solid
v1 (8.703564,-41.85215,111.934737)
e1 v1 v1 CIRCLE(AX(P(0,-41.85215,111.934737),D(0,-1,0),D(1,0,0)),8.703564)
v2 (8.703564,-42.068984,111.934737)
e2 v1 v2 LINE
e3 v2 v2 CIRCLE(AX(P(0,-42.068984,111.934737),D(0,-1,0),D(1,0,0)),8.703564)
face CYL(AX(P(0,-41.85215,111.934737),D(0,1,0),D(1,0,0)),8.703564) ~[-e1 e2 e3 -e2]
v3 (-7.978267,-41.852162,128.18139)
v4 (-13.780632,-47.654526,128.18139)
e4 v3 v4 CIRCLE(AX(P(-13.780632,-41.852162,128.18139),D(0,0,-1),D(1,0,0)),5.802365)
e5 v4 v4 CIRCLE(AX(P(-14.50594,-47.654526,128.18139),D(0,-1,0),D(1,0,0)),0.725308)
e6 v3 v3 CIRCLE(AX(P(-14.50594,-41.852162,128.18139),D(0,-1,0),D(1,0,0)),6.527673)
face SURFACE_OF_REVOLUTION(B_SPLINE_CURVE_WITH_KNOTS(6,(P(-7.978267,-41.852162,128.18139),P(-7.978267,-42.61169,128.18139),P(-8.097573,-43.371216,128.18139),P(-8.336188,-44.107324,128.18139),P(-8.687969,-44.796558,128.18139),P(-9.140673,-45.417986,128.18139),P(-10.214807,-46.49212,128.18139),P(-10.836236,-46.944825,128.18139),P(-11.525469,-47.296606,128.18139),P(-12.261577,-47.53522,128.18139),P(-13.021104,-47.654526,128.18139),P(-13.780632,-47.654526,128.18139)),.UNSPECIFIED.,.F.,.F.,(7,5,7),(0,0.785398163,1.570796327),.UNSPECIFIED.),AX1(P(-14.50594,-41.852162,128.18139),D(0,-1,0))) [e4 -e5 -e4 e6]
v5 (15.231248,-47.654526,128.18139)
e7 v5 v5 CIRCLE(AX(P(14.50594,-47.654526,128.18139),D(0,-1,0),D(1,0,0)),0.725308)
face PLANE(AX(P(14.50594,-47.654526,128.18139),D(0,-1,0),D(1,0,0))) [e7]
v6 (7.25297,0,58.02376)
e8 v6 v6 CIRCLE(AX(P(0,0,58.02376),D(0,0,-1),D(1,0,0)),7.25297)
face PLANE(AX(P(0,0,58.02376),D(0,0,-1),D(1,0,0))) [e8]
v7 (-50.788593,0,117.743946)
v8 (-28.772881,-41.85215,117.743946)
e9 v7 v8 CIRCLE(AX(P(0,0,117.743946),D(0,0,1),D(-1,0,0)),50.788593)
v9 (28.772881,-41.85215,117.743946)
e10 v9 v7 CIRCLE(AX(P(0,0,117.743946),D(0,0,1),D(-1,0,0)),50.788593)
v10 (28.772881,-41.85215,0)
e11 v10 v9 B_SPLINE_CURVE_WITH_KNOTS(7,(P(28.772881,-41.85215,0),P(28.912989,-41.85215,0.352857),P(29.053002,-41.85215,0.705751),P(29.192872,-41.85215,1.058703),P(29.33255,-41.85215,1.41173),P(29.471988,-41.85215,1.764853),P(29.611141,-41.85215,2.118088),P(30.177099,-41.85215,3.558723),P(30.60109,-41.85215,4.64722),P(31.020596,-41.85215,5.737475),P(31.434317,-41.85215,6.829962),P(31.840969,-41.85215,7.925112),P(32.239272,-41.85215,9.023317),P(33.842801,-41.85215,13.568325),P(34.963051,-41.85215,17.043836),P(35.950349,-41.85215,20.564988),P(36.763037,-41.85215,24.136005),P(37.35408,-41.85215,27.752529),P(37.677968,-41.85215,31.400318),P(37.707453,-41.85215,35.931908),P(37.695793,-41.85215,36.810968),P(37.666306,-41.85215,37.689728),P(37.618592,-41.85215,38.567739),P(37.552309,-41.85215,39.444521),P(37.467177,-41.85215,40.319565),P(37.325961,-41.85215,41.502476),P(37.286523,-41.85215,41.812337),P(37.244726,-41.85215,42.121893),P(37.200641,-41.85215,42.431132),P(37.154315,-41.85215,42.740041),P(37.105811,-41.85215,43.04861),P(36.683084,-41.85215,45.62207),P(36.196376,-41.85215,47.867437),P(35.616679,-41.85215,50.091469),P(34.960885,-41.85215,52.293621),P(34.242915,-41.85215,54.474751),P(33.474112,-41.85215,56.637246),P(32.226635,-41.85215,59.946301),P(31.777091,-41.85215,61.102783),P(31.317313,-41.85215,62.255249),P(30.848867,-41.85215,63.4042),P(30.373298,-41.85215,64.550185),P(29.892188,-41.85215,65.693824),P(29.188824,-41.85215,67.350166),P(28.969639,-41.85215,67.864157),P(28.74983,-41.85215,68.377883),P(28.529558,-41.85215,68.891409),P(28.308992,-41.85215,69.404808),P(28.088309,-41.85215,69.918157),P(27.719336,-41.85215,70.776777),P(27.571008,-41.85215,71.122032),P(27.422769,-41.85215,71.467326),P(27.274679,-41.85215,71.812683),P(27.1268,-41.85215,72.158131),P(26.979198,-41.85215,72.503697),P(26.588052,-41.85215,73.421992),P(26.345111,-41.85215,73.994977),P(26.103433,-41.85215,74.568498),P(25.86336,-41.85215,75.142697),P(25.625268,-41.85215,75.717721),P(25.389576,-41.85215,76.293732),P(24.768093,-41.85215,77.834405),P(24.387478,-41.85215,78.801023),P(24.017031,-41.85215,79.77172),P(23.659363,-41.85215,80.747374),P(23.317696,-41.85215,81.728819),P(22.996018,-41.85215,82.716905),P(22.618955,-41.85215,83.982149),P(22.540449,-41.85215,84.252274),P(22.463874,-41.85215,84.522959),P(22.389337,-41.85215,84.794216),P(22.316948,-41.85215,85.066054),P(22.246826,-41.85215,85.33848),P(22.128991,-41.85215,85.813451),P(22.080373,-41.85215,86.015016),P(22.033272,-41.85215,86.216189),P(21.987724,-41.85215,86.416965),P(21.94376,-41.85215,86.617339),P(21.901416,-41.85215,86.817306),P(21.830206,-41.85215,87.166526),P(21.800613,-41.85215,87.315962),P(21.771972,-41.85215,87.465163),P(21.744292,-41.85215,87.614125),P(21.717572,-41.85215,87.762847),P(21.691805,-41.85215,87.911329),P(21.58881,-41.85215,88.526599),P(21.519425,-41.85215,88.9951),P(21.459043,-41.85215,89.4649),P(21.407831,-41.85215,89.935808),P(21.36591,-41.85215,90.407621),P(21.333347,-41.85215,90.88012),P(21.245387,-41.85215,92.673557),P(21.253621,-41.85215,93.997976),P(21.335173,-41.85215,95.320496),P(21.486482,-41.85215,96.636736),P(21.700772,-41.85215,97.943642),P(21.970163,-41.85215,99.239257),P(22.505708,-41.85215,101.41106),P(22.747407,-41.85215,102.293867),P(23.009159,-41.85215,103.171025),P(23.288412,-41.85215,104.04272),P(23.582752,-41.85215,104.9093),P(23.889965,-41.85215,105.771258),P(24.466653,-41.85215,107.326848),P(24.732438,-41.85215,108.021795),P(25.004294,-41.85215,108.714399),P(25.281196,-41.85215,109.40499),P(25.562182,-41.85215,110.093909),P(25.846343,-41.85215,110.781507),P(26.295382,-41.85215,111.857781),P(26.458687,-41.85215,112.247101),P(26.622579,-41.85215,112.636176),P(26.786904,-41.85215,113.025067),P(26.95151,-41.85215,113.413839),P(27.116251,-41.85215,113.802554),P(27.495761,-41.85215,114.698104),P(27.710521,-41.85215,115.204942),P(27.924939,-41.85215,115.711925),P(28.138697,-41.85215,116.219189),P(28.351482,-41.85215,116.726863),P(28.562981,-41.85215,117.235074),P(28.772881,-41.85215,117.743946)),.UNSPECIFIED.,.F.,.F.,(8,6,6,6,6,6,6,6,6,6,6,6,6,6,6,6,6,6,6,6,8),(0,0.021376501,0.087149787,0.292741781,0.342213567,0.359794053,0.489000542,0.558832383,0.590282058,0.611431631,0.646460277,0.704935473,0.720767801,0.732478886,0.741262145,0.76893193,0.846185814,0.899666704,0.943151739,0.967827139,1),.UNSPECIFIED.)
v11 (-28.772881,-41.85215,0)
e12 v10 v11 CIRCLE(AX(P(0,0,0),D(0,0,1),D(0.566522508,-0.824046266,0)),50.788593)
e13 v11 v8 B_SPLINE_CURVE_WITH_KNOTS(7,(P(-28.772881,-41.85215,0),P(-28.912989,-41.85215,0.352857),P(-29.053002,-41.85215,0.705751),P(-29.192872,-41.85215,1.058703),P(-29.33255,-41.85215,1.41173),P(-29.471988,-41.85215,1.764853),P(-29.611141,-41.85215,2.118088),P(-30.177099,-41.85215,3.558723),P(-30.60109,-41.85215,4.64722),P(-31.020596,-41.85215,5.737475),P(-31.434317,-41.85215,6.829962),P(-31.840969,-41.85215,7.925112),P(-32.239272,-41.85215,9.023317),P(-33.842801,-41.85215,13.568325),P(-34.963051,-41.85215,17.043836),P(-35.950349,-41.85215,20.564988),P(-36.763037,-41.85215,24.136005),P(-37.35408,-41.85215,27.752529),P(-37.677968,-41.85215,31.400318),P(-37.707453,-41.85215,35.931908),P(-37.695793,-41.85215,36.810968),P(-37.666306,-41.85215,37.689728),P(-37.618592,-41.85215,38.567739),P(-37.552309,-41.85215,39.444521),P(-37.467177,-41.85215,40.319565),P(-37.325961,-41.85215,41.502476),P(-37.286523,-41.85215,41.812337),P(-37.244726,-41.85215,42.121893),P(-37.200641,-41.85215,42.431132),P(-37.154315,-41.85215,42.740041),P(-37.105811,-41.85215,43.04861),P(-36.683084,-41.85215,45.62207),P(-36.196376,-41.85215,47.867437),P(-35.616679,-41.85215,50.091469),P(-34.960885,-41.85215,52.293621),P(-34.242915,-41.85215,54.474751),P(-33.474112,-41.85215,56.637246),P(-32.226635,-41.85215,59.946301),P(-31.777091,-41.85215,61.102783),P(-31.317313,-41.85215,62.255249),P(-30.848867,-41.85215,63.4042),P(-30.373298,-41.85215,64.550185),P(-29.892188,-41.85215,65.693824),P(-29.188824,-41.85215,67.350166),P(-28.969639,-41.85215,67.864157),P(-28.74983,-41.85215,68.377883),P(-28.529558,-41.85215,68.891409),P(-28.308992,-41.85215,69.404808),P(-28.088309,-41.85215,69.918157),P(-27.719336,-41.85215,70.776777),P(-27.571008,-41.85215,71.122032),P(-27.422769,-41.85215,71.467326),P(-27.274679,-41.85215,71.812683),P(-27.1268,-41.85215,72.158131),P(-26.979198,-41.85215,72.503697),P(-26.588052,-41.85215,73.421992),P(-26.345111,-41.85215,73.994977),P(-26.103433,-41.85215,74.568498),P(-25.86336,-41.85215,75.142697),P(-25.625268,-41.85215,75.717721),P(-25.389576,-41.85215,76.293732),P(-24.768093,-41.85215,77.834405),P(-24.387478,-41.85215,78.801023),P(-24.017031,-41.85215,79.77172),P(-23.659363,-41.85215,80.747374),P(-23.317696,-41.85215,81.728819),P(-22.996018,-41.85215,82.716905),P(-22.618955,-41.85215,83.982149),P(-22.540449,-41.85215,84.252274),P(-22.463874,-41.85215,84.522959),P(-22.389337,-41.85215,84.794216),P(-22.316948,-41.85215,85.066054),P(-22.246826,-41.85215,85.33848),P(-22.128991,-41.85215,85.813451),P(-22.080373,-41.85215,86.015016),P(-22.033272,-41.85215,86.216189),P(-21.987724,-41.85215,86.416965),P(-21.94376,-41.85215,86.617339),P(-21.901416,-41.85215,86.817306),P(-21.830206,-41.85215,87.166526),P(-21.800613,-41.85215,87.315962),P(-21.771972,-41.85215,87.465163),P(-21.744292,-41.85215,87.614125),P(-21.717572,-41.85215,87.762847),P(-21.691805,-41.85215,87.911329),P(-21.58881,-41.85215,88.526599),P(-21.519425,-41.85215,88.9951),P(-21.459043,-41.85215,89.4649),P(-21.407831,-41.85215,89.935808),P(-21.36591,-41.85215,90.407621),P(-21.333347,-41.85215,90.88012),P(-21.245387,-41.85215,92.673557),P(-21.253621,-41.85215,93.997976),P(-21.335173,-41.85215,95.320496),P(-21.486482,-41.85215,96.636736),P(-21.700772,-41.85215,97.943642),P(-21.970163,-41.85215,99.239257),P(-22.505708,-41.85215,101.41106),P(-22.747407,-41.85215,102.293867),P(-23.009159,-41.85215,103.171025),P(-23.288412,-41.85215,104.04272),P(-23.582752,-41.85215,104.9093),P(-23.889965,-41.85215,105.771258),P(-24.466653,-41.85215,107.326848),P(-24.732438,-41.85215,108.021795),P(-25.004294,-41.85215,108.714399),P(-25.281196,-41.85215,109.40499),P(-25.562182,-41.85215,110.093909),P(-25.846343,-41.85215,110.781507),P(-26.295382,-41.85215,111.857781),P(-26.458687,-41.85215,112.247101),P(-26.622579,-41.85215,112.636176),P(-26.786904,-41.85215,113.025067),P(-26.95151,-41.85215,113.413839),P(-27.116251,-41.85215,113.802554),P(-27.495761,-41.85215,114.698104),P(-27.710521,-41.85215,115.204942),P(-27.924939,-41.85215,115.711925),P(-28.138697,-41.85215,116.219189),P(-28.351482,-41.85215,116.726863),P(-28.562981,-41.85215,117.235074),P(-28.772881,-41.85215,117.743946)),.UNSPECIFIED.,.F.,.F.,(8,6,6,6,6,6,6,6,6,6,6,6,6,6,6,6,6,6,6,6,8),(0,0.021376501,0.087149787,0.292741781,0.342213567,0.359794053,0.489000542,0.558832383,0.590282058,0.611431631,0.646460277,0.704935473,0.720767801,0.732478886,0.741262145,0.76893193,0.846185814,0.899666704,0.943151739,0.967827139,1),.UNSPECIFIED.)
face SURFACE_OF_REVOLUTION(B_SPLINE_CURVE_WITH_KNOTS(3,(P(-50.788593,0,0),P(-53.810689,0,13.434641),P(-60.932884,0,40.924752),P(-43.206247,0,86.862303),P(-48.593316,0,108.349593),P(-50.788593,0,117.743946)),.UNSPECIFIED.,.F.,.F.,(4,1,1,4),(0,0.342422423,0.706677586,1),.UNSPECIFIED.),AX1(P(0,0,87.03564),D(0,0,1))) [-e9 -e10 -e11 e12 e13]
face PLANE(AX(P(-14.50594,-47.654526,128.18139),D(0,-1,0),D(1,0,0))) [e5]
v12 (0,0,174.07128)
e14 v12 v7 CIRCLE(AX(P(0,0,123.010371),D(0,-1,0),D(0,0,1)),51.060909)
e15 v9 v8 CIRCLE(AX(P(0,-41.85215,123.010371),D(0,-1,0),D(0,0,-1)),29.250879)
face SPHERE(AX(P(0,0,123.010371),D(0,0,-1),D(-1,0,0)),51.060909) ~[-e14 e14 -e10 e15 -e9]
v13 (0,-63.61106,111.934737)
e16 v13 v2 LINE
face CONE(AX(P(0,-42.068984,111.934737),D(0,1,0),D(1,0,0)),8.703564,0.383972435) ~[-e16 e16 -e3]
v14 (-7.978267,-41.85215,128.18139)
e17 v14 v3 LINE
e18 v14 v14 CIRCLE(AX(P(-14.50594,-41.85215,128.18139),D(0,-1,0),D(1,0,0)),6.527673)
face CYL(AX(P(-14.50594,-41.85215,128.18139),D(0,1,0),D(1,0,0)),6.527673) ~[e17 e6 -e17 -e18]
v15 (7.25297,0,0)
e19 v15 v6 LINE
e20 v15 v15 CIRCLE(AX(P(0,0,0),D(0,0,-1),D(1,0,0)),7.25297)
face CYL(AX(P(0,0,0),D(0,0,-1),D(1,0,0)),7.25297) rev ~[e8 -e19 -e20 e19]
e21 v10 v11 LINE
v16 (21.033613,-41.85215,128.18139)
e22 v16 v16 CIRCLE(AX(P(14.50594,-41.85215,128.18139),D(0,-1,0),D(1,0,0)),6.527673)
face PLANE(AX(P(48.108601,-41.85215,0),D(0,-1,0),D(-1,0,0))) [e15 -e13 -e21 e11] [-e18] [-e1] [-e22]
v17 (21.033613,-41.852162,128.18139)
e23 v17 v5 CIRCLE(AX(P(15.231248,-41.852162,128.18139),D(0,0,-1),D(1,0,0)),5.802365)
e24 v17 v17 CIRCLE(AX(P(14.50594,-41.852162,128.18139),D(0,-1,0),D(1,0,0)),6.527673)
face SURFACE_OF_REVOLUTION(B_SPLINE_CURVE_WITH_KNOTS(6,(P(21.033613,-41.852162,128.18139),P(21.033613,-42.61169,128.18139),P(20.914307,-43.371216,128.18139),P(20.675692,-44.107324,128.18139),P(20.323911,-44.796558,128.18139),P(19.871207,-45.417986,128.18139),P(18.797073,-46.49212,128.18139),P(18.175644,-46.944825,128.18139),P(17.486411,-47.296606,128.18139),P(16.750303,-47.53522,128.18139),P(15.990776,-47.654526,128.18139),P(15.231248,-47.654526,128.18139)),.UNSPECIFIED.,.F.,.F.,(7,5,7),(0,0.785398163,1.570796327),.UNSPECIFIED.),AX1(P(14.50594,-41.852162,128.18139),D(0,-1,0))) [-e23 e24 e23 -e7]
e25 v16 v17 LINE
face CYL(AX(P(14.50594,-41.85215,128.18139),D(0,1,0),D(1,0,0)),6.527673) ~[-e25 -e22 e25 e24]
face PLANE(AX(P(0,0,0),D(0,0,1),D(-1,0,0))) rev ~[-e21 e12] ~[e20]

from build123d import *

# Parameters (mm, degrees)
F3_DEPTH  = 177.8
F4_R      = 7.62
F5_DEPTH  = 19.05
F6_SIZE2  = 18.860161823
F6_SIZE   = 7.62
F4_R_2    = 5.715
F7_DEPTH  = 5.08
F8_R      = 5.07999
F9_R      = 6.35
F10_DEPTH = 50.8
F11_SCALE = 1.1422


# Not quite as in the source:
# - a fillet or chamfer is up to 0.001 mm smaller than in the source, because OpenCascade refuses the exact size


with BuildPart() as f1:
    # F0 (on Front) → F1 (revolve)
    with BuildSketch(Plane.XZ):
        with BuildLine():
            Line((-38.2711647941, 0), (0, 0))
            Line((0, 0), (0, 146.0500033258))
            Line((0, 146.0500033258), (0, 152.4))
            ThreePointArc((0, 152.4), (-33.2006597867, 137.6319951518), (-44.4655865431, 103.0852268133))
            add(Edge.make_bspline(
                [(-44.4655865431, 0), (-47.1114422222, 11.762074058), (-53.3469479224, 35.8297600734), (-37.8272166921, 76.0482431769), (-42.543614325, 94.8604386904), (-44.4655865431, 103.0852268133)],
                knots=[0, 0, 0, 0, 0.3424224234, 0.7066775859, 1, 1, 1, 1], degree=3))
            Line((-44.4655865431, 0), (-38.2711647941, 0))
        make_face()
    revolve(axis=Axis((0, 0, 76.2), (0, 0, 1)))

    # F2 (on Top) → F3 (cut)
    with BuildSketch(Plane.XY):
        Polygon((25.6092443837, -36.641700535), (-25.1907556163, -36.641700535), (-46.7807556163, -36.641700535), (-46.7807556163, -67.121700535), (42.1192443837, -67.121700535), (42.1192443837, -36.641700535), align=None)
    extrude(amount=F3_DEPTH, mode=Mode.SUBTRACT)

    # F4 (on face) → F5 (join)
    with BuildSketch(Plane.XZ.offset(36.641700535)):
        with Locations((0, 97.9992443837)):
            Circle(F4_R)
    extrude(amount=F5_DEPTH)

    # F6
    f6_edges = [f1.edges().sort_by_distance(p)[0] for p in [
        (-7.62, -55.691701, 97.999244),
    ]]
    f6_side = f1.faces().sort_by_distance((0, -55.691701, 97.999244))[0]
    chamfer(f6_edges, length=F6_SIZE, length2=F6_SIZE2, reference=f6_side)

    # F4 (on face) → F7 (join)
    with BuildSketch(Plane.XZ.offset(36.641700535)):
        with Locations((-12.7, 112.2232443837)):
            Circle(F4_R_2)
        with Locations((12.7, 112.2232443837)):
            Circle(F4_R_2)
    extrude(amount=F7_DEPTH)

    # F8 (radius 5.08 in the source; OpenCascade refuses exactly that, so slightly less here)
    f8_edges = [f1.edges().sort_by_distance(p)[0] for p in [
        (-18.415, -41.721701, 112.223244),
        (6.985, -41.721701, 112.223244),
    ]]
    fillet(f8_edges, radius=F8_R)

    # F9 (on face) → F10 (cut)
    with BuildSketch(Plane(origin=(0, 0, 0), x_dir=(1, 0, 0), z_dir=(0, 0, -1))):
        Circle(F9_R)
    extrude(amount=-F10_DEPTH, mode=Mode.SUBTRACT)


with BuildPart() as f1_1:
    # F11: moved
    add(f1.part.scale(F11_SCALE))


solid = f1_1.part
